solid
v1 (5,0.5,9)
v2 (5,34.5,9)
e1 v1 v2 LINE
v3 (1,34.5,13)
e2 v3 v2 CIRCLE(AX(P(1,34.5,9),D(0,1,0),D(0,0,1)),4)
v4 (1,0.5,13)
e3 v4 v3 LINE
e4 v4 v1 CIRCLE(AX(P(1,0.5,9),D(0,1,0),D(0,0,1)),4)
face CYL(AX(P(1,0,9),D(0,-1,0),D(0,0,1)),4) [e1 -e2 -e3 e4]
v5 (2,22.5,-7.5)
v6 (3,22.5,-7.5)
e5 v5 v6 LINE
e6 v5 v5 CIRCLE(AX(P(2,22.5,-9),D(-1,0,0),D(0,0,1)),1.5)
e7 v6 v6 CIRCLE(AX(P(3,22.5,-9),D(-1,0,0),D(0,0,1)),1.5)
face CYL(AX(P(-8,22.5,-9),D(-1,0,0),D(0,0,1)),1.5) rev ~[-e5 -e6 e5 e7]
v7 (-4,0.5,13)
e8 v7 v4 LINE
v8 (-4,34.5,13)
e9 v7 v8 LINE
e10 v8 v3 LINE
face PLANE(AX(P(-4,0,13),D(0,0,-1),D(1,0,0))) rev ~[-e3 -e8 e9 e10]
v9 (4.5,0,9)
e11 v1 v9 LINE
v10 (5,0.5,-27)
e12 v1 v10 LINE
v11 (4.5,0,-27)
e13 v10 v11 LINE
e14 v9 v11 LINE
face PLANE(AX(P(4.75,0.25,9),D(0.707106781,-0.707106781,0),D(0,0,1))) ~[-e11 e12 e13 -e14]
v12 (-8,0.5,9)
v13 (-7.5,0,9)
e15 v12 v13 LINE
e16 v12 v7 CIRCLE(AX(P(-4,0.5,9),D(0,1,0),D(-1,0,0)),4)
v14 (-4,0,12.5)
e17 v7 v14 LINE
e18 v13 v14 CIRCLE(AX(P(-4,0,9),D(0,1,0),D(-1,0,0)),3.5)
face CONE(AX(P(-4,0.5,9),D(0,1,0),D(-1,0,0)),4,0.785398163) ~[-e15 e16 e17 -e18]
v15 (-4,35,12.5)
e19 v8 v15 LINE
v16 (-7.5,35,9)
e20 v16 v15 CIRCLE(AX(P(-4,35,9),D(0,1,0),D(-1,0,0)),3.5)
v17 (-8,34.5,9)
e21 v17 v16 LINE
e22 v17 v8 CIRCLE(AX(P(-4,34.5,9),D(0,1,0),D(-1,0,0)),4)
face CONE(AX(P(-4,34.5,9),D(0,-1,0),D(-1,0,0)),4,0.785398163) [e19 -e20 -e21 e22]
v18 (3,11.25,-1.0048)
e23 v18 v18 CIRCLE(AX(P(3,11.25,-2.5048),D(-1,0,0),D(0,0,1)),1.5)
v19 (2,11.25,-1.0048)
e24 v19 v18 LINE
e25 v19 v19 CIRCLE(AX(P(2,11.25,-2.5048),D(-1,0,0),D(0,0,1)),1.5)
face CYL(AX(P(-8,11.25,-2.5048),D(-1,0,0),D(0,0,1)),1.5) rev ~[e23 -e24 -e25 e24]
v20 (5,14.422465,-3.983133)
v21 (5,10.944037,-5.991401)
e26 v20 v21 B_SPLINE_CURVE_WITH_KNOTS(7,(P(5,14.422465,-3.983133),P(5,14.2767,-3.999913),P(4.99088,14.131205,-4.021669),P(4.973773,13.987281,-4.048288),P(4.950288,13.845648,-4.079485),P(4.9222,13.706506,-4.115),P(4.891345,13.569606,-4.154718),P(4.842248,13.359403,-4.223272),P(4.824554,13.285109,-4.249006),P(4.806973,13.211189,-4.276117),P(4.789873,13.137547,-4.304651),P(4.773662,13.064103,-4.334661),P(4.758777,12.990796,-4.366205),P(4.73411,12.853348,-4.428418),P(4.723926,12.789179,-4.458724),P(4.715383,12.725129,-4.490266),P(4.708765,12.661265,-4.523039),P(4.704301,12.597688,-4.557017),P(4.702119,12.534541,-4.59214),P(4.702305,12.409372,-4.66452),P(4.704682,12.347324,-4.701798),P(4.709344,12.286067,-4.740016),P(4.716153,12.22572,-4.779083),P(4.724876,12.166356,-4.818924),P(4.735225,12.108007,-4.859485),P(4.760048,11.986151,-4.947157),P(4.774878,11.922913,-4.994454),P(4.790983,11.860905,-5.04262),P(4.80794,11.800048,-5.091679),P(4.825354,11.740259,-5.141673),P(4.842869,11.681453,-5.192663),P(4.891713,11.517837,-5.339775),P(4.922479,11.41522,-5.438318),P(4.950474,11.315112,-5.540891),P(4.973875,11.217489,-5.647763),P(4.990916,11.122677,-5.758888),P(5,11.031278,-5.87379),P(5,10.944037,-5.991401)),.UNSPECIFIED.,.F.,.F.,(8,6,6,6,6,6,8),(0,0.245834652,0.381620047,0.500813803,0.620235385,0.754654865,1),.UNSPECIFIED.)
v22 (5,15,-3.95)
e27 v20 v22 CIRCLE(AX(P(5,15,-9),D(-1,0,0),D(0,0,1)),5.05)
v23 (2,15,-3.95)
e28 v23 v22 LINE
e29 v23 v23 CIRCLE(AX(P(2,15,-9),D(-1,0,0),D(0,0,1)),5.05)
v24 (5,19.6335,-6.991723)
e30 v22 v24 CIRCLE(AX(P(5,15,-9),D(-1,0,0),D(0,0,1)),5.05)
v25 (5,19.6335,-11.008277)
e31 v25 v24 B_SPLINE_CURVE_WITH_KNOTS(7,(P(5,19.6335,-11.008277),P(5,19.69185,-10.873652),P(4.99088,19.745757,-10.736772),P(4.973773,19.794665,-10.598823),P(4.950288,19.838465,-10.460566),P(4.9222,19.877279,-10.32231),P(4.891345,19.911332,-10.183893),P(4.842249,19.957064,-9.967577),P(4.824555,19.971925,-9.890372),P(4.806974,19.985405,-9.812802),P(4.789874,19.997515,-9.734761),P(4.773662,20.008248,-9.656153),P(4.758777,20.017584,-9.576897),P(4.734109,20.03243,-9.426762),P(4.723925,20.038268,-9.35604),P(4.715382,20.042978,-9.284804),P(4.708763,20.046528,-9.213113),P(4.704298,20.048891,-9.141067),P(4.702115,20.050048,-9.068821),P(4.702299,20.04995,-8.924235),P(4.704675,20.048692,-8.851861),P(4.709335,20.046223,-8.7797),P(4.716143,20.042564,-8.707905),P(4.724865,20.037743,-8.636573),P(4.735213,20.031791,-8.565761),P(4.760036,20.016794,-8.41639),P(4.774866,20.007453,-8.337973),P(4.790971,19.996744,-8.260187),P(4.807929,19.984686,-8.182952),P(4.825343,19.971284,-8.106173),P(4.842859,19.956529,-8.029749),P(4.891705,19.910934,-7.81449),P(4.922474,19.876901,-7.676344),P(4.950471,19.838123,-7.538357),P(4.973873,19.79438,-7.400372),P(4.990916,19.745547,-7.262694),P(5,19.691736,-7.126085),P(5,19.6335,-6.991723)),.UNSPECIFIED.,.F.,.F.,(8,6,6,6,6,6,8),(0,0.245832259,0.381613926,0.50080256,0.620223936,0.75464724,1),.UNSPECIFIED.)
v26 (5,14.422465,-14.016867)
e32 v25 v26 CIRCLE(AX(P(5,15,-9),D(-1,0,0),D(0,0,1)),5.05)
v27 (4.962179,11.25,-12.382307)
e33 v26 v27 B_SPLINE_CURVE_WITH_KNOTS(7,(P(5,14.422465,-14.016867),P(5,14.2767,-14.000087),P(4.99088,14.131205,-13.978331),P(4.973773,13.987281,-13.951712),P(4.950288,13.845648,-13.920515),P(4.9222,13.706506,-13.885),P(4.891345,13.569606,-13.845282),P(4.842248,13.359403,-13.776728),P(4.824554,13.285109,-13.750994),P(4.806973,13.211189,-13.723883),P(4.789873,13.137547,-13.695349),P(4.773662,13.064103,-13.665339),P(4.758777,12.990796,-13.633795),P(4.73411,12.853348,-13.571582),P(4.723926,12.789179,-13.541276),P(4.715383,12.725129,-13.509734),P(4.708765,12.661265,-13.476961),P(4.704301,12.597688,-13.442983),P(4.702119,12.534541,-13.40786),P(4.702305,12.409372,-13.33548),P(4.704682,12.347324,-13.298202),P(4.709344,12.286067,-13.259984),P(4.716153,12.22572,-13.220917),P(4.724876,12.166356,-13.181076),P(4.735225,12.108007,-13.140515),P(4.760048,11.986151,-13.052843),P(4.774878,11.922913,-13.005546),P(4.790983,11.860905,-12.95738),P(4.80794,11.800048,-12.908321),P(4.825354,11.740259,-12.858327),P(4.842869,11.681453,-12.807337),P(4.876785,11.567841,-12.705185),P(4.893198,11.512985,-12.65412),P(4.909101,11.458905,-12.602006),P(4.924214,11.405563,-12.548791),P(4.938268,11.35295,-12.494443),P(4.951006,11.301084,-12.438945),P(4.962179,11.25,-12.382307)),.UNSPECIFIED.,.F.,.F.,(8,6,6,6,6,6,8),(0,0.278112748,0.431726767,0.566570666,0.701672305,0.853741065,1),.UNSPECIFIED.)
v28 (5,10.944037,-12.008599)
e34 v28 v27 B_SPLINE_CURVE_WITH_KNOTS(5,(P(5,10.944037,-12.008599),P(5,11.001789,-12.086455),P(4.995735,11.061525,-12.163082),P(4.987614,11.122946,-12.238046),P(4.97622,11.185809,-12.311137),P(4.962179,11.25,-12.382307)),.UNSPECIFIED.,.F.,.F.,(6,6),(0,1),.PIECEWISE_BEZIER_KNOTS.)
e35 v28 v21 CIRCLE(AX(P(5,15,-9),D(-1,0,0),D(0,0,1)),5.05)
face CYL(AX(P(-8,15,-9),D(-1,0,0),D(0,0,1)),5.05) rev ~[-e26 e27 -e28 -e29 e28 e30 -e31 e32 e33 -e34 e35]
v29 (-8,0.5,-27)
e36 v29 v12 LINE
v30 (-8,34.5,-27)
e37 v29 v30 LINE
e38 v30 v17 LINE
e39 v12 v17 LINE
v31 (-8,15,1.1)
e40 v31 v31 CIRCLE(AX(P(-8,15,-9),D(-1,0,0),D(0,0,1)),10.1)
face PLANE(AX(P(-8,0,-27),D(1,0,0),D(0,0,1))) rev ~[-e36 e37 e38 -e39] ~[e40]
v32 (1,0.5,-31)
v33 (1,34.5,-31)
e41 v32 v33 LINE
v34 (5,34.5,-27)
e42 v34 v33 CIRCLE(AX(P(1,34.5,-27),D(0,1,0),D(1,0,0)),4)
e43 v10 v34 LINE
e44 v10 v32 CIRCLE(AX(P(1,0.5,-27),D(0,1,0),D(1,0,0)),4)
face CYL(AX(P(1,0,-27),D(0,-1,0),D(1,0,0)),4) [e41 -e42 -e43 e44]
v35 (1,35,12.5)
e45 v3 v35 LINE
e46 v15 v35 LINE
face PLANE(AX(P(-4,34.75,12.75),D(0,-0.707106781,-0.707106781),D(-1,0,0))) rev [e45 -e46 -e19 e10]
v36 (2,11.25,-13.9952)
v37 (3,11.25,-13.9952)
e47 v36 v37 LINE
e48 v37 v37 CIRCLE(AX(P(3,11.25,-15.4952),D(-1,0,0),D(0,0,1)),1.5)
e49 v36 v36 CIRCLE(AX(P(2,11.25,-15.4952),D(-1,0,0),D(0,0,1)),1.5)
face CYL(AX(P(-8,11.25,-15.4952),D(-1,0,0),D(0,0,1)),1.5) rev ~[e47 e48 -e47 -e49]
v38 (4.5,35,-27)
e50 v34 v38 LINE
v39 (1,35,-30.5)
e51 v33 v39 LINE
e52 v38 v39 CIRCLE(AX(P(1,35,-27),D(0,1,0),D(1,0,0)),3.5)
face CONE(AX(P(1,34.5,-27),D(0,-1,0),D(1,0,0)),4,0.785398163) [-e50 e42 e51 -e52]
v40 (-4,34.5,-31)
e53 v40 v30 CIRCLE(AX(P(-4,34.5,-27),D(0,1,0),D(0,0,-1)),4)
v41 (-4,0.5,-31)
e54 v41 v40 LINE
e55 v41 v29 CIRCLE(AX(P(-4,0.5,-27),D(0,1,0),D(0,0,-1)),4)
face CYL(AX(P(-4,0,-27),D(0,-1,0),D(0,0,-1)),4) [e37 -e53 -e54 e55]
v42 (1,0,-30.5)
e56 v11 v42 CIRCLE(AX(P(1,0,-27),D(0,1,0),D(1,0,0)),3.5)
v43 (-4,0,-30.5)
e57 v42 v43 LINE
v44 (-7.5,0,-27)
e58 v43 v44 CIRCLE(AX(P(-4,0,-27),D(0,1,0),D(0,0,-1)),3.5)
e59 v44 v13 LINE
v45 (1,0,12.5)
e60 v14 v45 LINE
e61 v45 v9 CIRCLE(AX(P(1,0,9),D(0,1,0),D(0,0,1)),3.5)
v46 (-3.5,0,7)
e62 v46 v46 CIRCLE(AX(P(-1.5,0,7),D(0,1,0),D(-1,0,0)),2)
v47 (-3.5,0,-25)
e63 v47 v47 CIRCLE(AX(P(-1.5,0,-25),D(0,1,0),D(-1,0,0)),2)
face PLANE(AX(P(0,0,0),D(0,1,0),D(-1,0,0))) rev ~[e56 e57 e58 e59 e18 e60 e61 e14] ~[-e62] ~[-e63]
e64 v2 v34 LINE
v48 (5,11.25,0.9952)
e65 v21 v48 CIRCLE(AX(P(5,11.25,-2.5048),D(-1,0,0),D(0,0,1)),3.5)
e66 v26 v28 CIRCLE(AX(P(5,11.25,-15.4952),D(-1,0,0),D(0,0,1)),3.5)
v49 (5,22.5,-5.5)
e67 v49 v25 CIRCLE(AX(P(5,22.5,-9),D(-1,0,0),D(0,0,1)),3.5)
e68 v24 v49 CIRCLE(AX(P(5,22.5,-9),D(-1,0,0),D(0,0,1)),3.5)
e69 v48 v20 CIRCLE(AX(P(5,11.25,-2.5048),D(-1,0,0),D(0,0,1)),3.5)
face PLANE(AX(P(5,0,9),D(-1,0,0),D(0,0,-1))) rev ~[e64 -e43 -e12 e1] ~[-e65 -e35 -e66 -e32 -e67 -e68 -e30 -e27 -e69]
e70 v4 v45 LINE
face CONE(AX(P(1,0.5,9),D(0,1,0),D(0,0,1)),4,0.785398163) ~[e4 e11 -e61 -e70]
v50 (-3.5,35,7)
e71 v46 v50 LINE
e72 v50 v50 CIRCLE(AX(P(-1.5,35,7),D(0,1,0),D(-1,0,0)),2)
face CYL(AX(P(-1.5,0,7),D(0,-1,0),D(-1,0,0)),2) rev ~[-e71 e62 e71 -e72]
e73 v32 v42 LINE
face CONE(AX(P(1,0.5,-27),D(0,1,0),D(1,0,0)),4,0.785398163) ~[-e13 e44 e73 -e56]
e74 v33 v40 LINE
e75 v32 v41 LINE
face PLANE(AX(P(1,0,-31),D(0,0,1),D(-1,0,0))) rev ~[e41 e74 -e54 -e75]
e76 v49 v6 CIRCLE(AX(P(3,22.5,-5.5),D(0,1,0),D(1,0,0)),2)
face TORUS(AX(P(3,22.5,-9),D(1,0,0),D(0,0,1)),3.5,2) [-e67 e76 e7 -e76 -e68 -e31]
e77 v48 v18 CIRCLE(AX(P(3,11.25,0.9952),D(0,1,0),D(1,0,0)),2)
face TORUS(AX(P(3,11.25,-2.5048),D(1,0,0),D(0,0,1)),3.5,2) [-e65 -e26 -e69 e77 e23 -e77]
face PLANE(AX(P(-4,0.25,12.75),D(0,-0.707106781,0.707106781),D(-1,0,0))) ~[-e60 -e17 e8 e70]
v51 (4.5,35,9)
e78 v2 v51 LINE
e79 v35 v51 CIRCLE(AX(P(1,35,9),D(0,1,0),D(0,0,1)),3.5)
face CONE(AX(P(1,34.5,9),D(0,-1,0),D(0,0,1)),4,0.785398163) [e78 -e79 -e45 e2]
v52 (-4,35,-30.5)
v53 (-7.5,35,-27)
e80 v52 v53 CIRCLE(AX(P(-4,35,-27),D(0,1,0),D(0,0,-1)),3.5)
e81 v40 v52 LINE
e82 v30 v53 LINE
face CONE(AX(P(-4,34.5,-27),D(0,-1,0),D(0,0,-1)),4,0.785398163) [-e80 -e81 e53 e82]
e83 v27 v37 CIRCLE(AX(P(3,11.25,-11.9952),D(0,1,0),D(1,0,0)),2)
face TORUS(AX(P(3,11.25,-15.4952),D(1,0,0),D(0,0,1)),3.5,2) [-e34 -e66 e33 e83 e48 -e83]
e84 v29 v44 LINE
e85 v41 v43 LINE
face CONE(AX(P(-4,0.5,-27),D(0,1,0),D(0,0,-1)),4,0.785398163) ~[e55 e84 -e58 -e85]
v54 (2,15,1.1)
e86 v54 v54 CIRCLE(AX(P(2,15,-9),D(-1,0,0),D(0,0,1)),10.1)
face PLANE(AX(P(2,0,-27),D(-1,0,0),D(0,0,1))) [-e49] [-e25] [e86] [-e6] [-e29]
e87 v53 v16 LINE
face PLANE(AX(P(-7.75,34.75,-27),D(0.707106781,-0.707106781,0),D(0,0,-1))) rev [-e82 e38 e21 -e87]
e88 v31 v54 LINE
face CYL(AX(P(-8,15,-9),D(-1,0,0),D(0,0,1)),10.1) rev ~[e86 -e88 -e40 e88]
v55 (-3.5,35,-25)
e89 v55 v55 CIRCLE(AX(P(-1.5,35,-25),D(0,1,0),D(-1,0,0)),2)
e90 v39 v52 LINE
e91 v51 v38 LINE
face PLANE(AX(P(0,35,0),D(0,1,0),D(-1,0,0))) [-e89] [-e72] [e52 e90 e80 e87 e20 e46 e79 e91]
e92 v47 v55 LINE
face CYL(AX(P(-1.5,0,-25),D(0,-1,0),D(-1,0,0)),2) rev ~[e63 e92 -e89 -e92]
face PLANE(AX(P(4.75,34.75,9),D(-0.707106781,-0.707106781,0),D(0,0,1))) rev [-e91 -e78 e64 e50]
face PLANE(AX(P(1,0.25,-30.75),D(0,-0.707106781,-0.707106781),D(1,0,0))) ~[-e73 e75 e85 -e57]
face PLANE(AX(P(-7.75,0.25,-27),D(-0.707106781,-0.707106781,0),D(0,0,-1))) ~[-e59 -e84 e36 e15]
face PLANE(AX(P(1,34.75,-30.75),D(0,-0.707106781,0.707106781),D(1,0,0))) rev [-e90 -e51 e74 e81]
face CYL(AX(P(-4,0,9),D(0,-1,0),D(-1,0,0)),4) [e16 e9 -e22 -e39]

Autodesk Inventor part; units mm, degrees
ref_plane "YZ Plane" through (0, 0, 0) normal (1, 0, 0) x (0, 1, 0)
ref_plane "XZ Plane" through (0, 0, 0) normal (0, 1, 0) x (-1, 0, 0)
ref_plane "XY Plane" through (0, 0, 0) normal (0, 0, 1) x (1, 0, 0)
sketch "Эскиз1" plane through (0, 0, 0) normal (0, 1, 0) x (-1, 0, 0)
  line L0 (4, 13) -> (-1, 13)
  line L1 (-5, 9) -> (-5, -27)
  line L2 (-1, -31) -> (4, -31)
  line L3 (8, -27) -> (8, 9)
  circle A0 centre (1.5, 7) radius 2
  circle A1 centre (1.5, -25) radius 2
  arc A2 (8, 9) -> (4, 13) centre (4, 9) ccw
  arc A3 (-1, 13) -> (-5, 9) centre (-1, 9) ccw
  arc A4 (-5, -27) -> (-1, -31) centre (-1, -27) ccw
  arc A5 (4, -31) -> (8, -27) centre (4, -27) ccw
  point P0 (0, 0)
  point P1 (-5, -31)
  point P2 (-5, 13)
  point P3 (8, -31)
  dimension "d0" = 13
  dimension "d1" = 44
  dimension "d2" = 4
  dimension "d3" = 4
  dimension "d4" = 32
  dimension "d5" = 6.5
  dimension "d6" = 6
  dimension "d7" = 4
extrude "Выдавливание1" add sketch "Эскиз1" along normal blind 35
sketch "Эскиз2" plane through (-8, 0, -27) normal (-1, 0, 0) x (0, 0, 1)
  circle A0 centre (18, 15) radius 10.1
  circle A1 centre (18, 15) radius 5.05
  line L0 (0, 0) -> (36, 0) projected
  line L1 (36, 0) -> (36, 35) projected
  circle A2 centre (18, 15) radius 7.5 construction
  circle A3 centre (18, 22.5) radius 1.5
  line L2 (18, 15) -> (25.5, 15)
  line L3 (18, 15) -> (24.4952, 11.25)
  line L4 (18, 15) -> (25.5, 15) construction
  circle A4 centre (24.4952, 11.25) radius 1.5
  line L5 (18, 15) -> (10.5, 15)
  line L6 (18, 15) -> (24.4952, 11.25)
  line L7 (18, 15) -> (25.5, 15) construction
  line L8 (18, 15) -> (11.5048, 11.25)
  line L9 (18, 15) -> (25.5, 15) construction
  circle A5 centre (11.5048, 11.25) radius 1.5
  point P0 (27, 0)
  dimension "d10" = 20.2
  dimension "d11" = 10.1
  dimension "d12" = 15
  dimension "d13" = 18
  dimension "d14" = 15
  dimension "d15" = 3
  dimension "d16" = 30
  dimension "d17" = 3
  dimension "d18" = 30
  dimension "d19" = 150
  dimension "d20" = 3
extrude "Выдавливание2" cut sketch "Эскиз2" against normal blind 40 contours L2 L5 A1 | A1 L3 L2 | L5 L8 A1 | A1 L8 L3 | A3 | A4 | A5
sketch "Эскиз3" plane through (-8, 0, -27) normal (-1, 0, 0) x (0, 0, 1)
  circle A0 centre (18, 15) radius 5
  circle A1 centre (18, 15) radius 10.1
  line L0 (0, 0) -> (36, 0) projected
  point P0 (27, 0)
  dimension "d23" = 20.2
  dimension "d29" = 15
extrude "Выдавливание3" cut sketch "Эскиз3" against normal blind 10
chamfer "Фаска1" distance 0.5 angle 45 16 edges at (-8, 35, -9) (-6.8284, 35, 11.8284) (-1.5, 35, 13) (3.8284, 35, 11.8284) (5, 35, -9) (3.8284, 35, -29.8284) (-1.5, 35, -31) (-6.8284, 35, -29.8284) (-8, 0, -9) (-6.8284, 0, 11.8284) (-1.5, 0, 13) (3.8284, 0, 11.8284) (5, 0, -9) (3.8284, 0, -29.8284) (-1.5, 0, -31) (-6.8284, 0, -29.8284)
fillet "Сопряжение1" radius 2 3 edges at (5, 22.5, -10.5) (5, 11.25, -4.0048) (5, 11.25, -16.9952)
properties part number "fastenin_motor"
